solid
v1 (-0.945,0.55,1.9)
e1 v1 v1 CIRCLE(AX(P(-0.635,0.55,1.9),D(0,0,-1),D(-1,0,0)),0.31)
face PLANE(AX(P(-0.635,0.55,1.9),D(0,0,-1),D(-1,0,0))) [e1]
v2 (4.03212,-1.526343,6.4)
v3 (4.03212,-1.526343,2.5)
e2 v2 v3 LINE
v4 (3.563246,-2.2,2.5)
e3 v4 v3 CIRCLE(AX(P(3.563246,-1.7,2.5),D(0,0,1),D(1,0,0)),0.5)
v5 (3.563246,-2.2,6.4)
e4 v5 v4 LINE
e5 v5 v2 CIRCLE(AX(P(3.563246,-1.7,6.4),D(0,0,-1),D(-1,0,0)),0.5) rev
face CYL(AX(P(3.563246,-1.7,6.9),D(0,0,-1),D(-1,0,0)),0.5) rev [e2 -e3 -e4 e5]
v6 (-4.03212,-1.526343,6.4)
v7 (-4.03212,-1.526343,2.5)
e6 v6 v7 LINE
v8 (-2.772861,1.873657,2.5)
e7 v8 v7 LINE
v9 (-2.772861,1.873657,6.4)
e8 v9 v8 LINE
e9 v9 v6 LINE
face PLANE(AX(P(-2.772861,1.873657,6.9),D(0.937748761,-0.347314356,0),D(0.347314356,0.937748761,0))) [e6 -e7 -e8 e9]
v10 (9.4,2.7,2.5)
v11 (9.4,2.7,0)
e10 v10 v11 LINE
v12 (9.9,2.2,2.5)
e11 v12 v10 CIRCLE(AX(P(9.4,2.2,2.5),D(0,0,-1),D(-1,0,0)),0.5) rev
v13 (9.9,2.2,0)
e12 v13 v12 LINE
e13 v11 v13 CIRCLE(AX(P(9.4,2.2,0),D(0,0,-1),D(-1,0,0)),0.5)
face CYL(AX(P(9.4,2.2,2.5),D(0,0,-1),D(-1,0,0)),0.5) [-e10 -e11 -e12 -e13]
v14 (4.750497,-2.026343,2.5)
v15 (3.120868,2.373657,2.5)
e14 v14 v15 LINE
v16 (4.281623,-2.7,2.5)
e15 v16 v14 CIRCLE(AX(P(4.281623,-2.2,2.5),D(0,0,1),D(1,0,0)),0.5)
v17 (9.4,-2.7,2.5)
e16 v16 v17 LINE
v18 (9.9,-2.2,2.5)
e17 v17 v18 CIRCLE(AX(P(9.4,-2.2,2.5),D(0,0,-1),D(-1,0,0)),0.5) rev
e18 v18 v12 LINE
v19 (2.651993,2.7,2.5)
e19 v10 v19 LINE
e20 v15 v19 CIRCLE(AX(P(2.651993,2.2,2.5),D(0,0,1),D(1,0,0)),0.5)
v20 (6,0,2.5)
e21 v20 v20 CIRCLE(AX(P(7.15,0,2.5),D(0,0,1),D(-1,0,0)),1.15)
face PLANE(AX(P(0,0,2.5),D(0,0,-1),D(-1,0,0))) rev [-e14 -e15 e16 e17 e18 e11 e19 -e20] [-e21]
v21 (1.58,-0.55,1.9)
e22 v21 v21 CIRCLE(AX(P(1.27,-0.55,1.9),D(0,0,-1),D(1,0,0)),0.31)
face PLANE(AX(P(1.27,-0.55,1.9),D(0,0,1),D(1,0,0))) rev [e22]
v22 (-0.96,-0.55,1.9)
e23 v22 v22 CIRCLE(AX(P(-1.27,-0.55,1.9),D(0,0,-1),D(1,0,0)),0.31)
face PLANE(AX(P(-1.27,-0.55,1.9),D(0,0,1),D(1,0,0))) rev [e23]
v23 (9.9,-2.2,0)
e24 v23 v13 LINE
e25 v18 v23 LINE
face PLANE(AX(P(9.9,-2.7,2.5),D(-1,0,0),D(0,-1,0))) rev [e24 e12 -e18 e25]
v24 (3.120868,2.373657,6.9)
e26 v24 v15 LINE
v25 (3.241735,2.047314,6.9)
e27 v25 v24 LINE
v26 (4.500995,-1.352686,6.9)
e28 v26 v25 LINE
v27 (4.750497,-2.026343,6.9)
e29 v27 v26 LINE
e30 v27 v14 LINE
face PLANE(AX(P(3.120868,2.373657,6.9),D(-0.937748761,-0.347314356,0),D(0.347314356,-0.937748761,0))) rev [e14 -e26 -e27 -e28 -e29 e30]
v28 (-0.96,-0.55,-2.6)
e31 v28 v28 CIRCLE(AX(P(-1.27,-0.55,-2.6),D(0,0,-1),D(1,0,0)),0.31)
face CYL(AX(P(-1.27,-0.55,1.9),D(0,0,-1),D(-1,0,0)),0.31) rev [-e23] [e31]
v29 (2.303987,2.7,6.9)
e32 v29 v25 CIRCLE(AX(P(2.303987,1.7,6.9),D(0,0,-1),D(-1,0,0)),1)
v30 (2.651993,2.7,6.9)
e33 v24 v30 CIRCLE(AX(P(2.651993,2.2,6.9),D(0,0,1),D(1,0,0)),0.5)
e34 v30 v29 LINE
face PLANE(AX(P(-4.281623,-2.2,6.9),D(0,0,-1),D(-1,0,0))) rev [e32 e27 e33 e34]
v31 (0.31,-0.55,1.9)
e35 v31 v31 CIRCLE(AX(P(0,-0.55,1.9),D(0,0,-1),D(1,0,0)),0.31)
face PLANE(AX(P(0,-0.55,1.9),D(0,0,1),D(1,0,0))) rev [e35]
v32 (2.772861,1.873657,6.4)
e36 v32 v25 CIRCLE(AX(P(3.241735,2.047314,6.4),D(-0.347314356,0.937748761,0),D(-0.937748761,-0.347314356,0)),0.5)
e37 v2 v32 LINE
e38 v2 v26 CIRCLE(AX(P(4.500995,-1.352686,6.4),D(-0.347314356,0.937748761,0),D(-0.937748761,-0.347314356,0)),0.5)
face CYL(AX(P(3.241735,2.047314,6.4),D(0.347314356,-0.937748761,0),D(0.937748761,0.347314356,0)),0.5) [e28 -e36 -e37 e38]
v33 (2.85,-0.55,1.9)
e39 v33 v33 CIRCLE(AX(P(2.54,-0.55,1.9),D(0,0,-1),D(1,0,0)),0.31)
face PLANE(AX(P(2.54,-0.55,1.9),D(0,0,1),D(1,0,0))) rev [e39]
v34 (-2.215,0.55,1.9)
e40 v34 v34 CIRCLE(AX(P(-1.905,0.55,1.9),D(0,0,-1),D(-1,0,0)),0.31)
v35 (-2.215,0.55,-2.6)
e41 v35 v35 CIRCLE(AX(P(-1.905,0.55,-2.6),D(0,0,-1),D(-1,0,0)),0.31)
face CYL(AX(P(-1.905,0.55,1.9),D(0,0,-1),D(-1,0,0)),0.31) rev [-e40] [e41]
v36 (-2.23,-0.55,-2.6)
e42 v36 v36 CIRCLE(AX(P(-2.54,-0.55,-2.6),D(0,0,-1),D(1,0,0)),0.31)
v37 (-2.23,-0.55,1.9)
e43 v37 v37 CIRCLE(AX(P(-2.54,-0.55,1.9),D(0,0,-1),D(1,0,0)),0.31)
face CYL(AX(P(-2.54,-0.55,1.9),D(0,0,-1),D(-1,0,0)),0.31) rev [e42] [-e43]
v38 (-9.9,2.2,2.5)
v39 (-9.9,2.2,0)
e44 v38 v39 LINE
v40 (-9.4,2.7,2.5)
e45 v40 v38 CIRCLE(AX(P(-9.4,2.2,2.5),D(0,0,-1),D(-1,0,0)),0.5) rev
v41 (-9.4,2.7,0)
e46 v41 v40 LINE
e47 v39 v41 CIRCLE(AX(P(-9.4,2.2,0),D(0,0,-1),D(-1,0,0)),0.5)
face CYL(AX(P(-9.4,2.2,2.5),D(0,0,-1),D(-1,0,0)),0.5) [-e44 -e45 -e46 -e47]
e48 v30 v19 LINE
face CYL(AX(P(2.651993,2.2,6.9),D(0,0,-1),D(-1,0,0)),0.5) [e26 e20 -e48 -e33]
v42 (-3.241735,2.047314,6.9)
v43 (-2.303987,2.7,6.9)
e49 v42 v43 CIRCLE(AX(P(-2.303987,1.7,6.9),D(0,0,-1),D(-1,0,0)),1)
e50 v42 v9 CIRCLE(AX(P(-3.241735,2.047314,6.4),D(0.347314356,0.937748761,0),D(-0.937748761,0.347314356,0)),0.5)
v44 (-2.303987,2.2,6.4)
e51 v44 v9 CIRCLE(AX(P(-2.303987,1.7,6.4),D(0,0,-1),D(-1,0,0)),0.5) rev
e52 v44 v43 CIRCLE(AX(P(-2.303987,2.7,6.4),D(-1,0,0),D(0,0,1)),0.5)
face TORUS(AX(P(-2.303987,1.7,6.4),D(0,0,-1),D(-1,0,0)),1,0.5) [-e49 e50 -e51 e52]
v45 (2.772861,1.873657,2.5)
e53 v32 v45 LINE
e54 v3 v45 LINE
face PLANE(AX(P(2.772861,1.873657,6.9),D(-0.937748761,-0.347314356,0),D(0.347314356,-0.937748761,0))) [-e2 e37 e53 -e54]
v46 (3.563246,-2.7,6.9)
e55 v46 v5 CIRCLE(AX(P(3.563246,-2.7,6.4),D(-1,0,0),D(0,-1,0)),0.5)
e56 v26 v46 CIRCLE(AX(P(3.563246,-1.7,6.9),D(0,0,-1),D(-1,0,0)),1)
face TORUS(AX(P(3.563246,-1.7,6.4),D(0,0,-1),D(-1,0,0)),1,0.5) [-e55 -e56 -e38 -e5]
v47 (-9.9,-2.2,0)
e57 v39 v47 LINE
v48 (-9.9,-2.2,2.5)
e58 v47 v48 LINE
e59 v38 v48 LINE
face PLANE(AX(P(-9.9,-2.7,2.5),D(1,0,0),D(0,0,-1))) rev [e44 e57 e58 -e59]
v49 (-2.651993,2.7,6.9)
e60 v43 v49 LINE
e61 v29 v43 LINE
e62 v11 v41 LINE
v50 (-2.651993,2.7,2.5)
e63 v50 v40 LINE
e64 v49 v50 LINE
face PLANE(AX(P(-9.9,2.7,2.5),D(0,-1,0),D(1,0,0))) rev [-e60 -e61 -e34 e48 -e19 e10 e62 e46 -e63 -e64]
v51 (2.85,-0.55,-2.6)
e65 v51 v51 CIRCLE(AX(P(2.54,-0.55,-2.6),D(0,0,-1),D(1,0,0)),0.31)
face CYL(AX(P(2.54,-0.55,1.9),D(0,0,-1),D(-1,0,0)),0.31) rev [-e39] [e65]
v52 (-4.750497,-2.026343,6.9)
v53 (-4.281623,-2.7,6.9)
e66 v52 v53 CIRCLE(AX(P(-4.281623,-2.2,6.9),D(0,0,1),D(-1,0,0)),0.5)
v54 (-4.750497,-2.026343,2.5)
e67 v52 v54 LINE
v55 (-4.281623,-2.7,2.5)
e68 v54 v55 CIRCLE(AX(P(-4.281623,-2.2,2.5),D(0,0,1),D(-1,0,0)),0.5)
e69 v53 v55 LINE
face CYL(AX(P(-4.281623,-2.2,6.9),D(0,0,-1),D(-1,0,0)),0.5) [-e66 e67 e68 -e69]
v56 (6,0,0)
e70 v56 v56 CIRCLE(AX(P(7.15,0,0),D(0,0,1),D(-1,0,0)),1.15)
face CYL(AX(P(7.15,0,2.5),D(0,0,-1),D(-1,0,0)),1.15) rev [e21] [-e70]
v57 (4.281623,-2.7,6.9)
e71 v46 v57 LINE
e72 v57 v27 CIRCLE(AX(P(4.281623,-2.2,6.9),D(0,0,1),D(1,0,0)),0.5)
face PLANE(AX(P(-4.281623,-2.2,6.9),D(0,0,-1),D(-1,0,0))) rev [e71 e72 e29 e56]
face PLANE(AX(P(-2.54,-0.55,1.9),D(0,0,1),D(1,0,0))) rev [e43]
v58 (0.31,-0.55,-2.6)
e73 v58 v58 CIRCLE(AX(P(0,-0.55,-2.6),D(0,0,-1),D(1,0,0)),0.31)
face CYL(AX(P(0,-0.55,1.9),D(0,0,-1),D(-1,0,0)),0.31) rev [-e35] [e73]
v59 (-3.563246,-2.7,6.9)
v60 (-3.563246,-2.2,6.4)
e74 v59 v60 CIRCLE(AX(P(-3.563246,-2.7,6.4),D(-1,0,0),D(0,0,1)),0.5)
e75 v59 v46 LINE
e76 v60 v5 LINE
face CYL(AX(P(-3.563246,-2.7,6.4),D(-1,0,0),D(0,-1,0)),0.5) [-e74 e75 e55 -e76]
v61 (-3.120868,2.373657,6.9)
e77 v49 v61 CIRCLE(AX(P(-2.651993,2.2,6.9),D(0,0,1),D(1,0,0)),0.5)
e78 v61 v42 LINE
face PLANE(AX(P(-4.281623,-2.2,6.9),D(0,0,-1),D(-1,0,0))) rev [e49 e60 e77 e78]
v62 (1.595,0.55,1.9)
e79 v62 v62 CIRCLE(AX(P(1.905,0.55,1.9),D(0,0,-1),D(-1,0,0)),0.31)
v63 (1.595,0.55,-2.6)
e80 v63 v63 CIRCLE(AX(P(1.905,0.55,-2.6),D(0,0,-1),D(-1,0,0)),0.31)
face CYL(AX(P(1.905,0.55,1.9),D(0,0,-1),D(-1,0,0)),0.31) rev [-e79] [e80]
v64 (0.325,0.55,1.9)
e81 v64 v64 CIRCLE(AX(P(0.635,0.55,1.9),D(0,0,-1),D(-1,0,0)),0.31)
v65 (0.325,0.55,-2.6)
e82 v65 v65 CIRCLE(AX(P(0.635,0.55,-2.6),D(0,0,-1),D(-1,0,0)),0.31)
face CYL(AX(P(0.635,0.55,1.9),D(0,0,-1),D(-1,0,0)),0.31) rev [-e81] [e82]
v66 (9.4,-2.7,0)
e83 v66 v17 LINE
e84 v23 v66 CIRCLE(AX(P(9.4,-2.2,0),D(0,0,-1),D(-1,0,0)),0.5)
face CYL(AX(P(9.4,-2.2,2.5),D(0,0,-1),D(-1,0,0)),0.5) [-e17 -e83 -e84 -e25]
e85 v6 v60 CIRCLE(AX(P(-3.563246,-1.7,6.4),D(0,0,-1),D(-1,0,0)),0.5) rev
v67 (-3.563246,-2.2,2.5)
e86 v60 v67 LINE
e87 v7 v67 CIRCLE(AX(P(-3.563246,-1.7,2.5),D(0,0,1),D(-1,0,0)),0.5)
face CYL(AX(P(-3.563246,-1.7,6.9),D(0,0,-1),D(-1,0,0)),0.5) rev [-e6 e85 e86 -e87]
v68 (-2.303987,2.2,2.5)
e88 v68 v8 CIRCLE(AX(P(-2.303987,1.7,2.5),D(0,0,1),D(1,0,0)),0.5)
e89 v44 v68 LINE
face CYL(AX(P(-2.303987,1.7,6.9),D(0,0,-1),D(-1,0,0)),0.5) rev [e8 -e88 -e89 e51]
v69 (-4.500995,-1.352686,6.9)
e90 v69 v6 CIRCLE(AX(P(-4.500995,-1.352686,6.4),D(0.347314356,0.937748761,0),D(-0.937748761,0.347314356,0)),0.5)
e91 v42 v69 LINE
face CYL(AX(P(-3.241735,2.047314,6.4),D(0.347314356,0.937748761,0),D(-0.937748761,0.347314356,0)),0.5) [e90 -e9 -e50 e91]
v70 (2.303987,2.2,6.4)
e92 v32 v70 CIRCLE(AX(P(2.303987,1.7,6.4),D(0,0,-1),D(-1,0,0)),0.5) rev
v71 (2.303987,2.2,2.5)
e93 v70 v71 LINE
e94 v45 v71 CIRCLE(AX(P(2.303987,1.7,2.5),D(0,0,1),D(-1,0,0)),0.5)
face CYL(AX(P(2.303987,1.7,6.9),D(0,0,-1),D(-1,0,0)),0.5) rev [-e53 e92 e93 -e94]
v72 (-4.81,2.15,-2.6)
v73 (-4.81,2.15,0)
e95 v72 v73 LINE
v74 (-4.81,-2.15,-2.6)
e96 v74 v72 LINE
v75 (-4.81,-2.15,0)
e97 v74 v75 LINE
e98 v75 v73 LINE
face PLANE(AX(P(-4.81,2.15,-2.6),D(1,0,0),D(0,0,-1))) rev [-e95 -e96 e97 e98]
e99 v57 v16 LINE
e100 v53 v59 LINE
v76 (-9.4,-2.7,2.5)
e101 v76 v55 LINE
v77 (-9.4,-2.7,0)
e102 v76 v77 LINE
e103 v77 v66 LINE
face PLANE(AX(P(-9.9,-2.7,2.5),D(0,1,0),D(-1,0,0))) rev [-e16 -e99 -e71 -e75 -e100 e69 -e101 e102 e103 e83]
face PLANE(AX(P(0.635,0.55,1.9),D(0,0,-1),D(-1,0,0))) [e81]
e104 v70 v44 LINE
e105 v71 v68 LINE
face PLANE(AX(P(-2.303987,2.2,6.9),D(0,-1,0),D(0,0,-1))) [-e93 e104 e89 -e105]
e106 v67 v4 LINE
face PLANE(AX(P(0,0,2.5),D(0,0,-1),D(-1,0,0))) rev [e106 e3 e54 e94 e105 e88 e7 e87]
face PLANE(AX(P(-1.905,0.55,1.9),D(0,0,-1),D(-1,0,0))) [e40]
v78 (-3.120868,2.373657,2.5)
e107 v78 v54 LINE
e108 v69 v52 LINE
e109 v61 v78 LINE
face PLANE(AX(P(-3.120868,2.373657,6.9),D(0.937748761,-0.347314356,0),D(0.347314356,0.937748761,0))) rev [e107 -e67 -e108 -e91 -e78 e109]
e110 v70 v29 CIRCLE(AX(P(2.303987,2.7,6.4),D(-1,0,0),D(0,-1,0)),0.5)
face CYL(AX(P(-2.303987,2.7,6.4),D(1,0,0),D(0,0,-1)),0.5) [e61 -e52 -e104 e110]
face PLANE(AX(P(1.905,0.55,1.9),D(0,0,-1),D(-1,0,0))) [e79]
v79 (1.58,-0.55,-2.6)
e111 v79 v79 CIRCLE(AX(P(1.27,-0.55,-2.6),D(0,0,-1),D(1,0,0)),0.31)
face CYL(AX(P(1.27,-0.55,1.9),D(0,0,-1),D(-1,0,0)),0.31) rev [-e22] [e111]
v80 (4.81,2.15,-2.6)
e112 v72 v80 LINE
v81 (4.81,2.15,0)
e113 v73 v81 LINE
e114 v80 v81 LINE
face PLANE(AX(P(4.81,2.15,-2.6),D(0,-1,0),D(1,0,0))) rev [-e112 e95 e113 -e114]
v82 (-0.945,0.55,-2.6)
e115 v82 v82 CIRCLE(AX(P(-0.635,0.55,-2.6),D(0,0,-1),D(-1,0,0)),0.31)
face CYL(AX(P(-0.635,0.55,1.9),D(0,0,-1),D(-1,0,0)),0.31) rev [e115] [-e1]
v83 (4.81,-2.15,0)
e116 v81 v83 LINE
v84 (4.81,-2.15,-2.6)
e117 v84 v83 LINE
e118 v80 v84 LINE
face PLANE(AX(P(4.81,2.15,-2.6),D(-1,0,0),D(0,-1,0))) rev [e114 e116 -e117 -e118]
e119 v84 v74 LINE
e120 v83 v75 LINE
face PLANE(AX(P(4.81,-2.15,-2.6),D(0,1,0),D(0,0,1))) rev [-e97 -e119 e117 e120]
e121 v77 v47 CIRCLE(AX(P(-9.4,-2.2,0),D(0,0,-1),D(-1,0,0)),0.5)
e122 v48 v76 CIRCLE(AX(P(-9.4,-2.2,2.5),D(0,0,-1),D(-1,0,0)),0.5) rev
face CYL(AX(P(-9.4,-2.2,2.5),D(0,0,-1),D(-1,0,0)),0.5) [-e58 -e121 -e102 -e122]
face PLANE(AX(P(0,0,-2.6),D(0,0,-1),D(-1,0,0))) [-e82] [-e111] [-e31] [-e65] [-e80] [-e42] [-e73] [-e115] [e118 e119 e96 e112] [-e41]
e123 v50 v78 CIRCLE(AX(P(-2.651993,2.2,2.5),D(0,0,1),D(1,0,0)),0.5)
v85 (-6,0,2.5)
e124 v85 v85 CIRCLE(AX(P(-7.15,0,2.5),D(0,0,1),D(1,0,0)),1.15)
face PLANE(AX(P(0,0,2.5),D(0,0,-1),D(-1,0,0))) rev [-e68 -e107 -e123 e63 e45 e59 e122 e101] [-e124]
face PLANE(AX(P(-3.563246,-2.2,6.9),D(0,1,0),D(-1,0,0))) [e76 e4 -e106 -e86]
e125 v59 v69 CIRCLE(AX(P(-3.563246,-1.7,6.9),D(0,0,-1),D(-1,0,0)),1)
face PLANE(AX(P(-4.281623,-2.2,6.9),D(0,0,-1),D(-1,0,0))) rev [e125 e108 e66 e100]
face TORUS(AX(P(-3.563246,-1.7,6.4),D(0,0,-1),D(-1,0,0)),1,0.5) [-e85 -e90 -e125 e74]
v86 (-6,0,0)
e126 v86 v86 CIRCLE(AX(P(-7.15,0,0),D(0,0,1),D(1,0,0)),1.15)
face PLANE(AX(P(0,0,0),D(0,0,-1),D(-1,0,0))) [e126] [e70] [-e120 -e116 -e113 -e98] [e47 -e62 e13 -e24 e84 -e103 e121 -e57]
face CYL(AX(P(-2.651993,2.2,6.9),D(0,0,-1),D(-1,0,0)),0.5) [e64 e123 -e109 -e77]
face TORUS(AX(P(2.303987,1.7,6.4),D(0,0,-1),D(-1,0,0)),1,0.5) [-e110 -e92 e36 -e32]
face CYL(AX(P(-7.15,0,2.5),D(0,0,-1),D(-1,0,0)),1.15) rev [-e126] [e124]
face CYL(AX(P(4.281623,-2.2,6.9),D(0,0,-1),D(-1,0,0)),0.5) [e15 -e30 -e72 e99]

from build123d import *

# Parameters (mm, degrees)
SKETCH_1_W          = 19.8
SKETCH_1_H          = 5.4
SKETCH_1_R          = 1.15
EXTRUDE_1_DEPTH     = 2.5
FILLET_1_R          = 0.5
FILLET_2_R          = 0.5
SKETCH_3_W          = 9.62
SKETCH_3_H          = 4.3
EXTRUDE_2_DEPTH     = 2.6
SKETCH_4_R          = 0.31
CUT_EXTRUDE_1_DEPTH = 4.5
EXTRUDE_3_DEPTH     = 4.4
FILLET_3_R          = 0.5


with BuildPart() as part:
    # 草图1 → 凸台-拉伸1 (new body)
    with BuildSketch(Plane.XY):
        Rectangle(SKETCH_1_W, SKETCH_1_H)
        with Locations((-7.15, 0)):
            Circle(SKETCH_1_R, mode=Mode.SUBTRACT)
        with Locations(Location((7.15, 0, 0), (0, 0, 180))):
            Circle(SKETCH_1_R, mode=Mode.SUBTRACT)
    extrude(amount=EXTRUDE_1_DEPTH)

    # 圆角1
    fillet_1_edges = [part.edges().sort_by_distance(p)[0] for p in [
        (-9.9, 2.7, 1.25),
    ]]
    fillet(fillet_1_edges, radius=FILLET_1_R)

    # 圆角2
    fillet_2_edges = [part.edges().sort_by_distance(p)[0] for p in [
        (9.9, 2.7, 1.25),
        (9.9, -2.7, 1.25),
        (-9.9, -2.7, 1.25),
    ]]
    fillet(fillet_2_edges, radius=FILLET_2_R)

    # 草图3 → 凸台-拉伸2 (add)
    with BuildSketch(Plane(origin=(0, 0, 0), x_dir=(-1, 0, 0), z_dir=(0, 0, -1))):
        Rectangle(SKETCH_3_W, SKETCH_3_H)
    extrude(amount=EXTRUDE_2_DEPTH)

    # 草图4 → 切除-拉伸1 (cut)
    with BuildSketch(Plane(origin=(0, 0, -2.6), x_dir=(-1, 0, 0), z_dir=(0, 0, -1))):
        with Locations((-1.905, 0.55)):
            Circle(SKETCH_4_R)
        with Locations((-0.635, 0.55)):
            Circle(SKETCH_4_R)
        with Locations((0.635, 0.55)):
            Circle(SKETCH_4_R)
        with Locations((1.905, 0.55)):
            Circle(SKETCH_4_R)
        with Locations(Location((-2.54, -0.55, 0), (0, 0, 180))):
            Circle(SKETCH_4_R)
        with Locations(Location((-1.27, -0.55, 0), (0, 0, 180))):
            Circle(SKETCH_4_R)
        with Locations(Location((0, -0.55, 0), (0, 0, 180))):
            Circle(SKETCH_4_R)
        with Locations(Location((1.27, -0.55, 0), (0, 0, 180))):
            Circle(SKETCH_4_R)
        with Locations(Location((2.54, -0.55, 0), (0, 0, 180))):
            Circle(SKETCH_4_R)
    extrude(amount=-CUT_EXTRUDE_1_DEPTH, mode=Mode.SUBTRACT)

    # 草图5 → 凸台-拉伸3 (add)
    with BuildSketch(Plane.XY.offset(2.5)):
        with BuildLine():
            Line((-2.651993332, 2.7), (2.651993332, 2.7))
            ThreePointArc((2.651993332, 2.7), (2.937625447, 2.610383107), (3.120867712, 2.373657178))
            Line((3.120867712, 2.373657178), (4.750497342, -2.026342822))
            ThreePointArc((4.750497342, -2.026342822), (4.692006068, -2.485632116), (4.281622961, -2.7))
            Line((4.281622961, -2.7), (-4.281622961, -2.7))
            ThreePointArc((-4.281622961, -2.7), (-4.692006068, -2.485632116), (-4.750497342, -2.026342822))
            Line((-4.750497342, -2.026342822), (-3.120867712, 2.373657178))
            ThreePointArc((-3.120867712, 2.373657178), (-2.937625447, 2.610383107), (-2.651993332, 2.7))
        make_face()
        with BuildLine():
            Line((-2.303986663, 2.2), (2.303986663, 2.2))
            ThreePointArc((2.303986663, 2.2), (2.589618779, 2.110383107), (2.772861043, 1.873657178))
            Line((2.772861043, 1.873657178), (4.032120303, -1.526342822))
            ThreePointArc((4.032120303, -1.526342822), (3.973629029, -1.985632116), (3.563245922, -2.2))
            Line((3.563245922, -2.2), (-3.563245922, -2.2))
            ThreePointArc((-3.563245922, -2.2), (-3.973629029, -1.985632116), (-4.032120303, -1.526342822))
            Line((-4.032120303, -1.526342822), (-2.772861043, 1.873657178))
            ThreePointArc((-2.772861043, 1.873657178), (-2.589618779, 2.110383107), (-2.303986663, 2.2))
        make_face(mode=Mode.SUBTRACT)
    extrude(amount=EXTRUDE_3_DEPTH)

    # 圆角3
    fillet_3_edges = [part.edges().sort_by_distance(p)[0] for p in [
        (-3.973629029, -1.985632116, 6.9),
        (0, -2.2, 6.9),
        (3.973629029, -1.985632116, 6.9),
        (3.402490673, 0.173657178, 6.9),
        (2.589618779, 2.110383107, 6.9),
        (0, 2.2, 6.9),
        (-2.589618779, 2.110383107, 6.9),
        (-3.402490673, 0.173657178, 6.9),
    ]]
    fillet(fillet_3_edges, radius=FILLET_3_R - 0.0001)  # a hair under: the kernel refuses the full size


solid = part.part
